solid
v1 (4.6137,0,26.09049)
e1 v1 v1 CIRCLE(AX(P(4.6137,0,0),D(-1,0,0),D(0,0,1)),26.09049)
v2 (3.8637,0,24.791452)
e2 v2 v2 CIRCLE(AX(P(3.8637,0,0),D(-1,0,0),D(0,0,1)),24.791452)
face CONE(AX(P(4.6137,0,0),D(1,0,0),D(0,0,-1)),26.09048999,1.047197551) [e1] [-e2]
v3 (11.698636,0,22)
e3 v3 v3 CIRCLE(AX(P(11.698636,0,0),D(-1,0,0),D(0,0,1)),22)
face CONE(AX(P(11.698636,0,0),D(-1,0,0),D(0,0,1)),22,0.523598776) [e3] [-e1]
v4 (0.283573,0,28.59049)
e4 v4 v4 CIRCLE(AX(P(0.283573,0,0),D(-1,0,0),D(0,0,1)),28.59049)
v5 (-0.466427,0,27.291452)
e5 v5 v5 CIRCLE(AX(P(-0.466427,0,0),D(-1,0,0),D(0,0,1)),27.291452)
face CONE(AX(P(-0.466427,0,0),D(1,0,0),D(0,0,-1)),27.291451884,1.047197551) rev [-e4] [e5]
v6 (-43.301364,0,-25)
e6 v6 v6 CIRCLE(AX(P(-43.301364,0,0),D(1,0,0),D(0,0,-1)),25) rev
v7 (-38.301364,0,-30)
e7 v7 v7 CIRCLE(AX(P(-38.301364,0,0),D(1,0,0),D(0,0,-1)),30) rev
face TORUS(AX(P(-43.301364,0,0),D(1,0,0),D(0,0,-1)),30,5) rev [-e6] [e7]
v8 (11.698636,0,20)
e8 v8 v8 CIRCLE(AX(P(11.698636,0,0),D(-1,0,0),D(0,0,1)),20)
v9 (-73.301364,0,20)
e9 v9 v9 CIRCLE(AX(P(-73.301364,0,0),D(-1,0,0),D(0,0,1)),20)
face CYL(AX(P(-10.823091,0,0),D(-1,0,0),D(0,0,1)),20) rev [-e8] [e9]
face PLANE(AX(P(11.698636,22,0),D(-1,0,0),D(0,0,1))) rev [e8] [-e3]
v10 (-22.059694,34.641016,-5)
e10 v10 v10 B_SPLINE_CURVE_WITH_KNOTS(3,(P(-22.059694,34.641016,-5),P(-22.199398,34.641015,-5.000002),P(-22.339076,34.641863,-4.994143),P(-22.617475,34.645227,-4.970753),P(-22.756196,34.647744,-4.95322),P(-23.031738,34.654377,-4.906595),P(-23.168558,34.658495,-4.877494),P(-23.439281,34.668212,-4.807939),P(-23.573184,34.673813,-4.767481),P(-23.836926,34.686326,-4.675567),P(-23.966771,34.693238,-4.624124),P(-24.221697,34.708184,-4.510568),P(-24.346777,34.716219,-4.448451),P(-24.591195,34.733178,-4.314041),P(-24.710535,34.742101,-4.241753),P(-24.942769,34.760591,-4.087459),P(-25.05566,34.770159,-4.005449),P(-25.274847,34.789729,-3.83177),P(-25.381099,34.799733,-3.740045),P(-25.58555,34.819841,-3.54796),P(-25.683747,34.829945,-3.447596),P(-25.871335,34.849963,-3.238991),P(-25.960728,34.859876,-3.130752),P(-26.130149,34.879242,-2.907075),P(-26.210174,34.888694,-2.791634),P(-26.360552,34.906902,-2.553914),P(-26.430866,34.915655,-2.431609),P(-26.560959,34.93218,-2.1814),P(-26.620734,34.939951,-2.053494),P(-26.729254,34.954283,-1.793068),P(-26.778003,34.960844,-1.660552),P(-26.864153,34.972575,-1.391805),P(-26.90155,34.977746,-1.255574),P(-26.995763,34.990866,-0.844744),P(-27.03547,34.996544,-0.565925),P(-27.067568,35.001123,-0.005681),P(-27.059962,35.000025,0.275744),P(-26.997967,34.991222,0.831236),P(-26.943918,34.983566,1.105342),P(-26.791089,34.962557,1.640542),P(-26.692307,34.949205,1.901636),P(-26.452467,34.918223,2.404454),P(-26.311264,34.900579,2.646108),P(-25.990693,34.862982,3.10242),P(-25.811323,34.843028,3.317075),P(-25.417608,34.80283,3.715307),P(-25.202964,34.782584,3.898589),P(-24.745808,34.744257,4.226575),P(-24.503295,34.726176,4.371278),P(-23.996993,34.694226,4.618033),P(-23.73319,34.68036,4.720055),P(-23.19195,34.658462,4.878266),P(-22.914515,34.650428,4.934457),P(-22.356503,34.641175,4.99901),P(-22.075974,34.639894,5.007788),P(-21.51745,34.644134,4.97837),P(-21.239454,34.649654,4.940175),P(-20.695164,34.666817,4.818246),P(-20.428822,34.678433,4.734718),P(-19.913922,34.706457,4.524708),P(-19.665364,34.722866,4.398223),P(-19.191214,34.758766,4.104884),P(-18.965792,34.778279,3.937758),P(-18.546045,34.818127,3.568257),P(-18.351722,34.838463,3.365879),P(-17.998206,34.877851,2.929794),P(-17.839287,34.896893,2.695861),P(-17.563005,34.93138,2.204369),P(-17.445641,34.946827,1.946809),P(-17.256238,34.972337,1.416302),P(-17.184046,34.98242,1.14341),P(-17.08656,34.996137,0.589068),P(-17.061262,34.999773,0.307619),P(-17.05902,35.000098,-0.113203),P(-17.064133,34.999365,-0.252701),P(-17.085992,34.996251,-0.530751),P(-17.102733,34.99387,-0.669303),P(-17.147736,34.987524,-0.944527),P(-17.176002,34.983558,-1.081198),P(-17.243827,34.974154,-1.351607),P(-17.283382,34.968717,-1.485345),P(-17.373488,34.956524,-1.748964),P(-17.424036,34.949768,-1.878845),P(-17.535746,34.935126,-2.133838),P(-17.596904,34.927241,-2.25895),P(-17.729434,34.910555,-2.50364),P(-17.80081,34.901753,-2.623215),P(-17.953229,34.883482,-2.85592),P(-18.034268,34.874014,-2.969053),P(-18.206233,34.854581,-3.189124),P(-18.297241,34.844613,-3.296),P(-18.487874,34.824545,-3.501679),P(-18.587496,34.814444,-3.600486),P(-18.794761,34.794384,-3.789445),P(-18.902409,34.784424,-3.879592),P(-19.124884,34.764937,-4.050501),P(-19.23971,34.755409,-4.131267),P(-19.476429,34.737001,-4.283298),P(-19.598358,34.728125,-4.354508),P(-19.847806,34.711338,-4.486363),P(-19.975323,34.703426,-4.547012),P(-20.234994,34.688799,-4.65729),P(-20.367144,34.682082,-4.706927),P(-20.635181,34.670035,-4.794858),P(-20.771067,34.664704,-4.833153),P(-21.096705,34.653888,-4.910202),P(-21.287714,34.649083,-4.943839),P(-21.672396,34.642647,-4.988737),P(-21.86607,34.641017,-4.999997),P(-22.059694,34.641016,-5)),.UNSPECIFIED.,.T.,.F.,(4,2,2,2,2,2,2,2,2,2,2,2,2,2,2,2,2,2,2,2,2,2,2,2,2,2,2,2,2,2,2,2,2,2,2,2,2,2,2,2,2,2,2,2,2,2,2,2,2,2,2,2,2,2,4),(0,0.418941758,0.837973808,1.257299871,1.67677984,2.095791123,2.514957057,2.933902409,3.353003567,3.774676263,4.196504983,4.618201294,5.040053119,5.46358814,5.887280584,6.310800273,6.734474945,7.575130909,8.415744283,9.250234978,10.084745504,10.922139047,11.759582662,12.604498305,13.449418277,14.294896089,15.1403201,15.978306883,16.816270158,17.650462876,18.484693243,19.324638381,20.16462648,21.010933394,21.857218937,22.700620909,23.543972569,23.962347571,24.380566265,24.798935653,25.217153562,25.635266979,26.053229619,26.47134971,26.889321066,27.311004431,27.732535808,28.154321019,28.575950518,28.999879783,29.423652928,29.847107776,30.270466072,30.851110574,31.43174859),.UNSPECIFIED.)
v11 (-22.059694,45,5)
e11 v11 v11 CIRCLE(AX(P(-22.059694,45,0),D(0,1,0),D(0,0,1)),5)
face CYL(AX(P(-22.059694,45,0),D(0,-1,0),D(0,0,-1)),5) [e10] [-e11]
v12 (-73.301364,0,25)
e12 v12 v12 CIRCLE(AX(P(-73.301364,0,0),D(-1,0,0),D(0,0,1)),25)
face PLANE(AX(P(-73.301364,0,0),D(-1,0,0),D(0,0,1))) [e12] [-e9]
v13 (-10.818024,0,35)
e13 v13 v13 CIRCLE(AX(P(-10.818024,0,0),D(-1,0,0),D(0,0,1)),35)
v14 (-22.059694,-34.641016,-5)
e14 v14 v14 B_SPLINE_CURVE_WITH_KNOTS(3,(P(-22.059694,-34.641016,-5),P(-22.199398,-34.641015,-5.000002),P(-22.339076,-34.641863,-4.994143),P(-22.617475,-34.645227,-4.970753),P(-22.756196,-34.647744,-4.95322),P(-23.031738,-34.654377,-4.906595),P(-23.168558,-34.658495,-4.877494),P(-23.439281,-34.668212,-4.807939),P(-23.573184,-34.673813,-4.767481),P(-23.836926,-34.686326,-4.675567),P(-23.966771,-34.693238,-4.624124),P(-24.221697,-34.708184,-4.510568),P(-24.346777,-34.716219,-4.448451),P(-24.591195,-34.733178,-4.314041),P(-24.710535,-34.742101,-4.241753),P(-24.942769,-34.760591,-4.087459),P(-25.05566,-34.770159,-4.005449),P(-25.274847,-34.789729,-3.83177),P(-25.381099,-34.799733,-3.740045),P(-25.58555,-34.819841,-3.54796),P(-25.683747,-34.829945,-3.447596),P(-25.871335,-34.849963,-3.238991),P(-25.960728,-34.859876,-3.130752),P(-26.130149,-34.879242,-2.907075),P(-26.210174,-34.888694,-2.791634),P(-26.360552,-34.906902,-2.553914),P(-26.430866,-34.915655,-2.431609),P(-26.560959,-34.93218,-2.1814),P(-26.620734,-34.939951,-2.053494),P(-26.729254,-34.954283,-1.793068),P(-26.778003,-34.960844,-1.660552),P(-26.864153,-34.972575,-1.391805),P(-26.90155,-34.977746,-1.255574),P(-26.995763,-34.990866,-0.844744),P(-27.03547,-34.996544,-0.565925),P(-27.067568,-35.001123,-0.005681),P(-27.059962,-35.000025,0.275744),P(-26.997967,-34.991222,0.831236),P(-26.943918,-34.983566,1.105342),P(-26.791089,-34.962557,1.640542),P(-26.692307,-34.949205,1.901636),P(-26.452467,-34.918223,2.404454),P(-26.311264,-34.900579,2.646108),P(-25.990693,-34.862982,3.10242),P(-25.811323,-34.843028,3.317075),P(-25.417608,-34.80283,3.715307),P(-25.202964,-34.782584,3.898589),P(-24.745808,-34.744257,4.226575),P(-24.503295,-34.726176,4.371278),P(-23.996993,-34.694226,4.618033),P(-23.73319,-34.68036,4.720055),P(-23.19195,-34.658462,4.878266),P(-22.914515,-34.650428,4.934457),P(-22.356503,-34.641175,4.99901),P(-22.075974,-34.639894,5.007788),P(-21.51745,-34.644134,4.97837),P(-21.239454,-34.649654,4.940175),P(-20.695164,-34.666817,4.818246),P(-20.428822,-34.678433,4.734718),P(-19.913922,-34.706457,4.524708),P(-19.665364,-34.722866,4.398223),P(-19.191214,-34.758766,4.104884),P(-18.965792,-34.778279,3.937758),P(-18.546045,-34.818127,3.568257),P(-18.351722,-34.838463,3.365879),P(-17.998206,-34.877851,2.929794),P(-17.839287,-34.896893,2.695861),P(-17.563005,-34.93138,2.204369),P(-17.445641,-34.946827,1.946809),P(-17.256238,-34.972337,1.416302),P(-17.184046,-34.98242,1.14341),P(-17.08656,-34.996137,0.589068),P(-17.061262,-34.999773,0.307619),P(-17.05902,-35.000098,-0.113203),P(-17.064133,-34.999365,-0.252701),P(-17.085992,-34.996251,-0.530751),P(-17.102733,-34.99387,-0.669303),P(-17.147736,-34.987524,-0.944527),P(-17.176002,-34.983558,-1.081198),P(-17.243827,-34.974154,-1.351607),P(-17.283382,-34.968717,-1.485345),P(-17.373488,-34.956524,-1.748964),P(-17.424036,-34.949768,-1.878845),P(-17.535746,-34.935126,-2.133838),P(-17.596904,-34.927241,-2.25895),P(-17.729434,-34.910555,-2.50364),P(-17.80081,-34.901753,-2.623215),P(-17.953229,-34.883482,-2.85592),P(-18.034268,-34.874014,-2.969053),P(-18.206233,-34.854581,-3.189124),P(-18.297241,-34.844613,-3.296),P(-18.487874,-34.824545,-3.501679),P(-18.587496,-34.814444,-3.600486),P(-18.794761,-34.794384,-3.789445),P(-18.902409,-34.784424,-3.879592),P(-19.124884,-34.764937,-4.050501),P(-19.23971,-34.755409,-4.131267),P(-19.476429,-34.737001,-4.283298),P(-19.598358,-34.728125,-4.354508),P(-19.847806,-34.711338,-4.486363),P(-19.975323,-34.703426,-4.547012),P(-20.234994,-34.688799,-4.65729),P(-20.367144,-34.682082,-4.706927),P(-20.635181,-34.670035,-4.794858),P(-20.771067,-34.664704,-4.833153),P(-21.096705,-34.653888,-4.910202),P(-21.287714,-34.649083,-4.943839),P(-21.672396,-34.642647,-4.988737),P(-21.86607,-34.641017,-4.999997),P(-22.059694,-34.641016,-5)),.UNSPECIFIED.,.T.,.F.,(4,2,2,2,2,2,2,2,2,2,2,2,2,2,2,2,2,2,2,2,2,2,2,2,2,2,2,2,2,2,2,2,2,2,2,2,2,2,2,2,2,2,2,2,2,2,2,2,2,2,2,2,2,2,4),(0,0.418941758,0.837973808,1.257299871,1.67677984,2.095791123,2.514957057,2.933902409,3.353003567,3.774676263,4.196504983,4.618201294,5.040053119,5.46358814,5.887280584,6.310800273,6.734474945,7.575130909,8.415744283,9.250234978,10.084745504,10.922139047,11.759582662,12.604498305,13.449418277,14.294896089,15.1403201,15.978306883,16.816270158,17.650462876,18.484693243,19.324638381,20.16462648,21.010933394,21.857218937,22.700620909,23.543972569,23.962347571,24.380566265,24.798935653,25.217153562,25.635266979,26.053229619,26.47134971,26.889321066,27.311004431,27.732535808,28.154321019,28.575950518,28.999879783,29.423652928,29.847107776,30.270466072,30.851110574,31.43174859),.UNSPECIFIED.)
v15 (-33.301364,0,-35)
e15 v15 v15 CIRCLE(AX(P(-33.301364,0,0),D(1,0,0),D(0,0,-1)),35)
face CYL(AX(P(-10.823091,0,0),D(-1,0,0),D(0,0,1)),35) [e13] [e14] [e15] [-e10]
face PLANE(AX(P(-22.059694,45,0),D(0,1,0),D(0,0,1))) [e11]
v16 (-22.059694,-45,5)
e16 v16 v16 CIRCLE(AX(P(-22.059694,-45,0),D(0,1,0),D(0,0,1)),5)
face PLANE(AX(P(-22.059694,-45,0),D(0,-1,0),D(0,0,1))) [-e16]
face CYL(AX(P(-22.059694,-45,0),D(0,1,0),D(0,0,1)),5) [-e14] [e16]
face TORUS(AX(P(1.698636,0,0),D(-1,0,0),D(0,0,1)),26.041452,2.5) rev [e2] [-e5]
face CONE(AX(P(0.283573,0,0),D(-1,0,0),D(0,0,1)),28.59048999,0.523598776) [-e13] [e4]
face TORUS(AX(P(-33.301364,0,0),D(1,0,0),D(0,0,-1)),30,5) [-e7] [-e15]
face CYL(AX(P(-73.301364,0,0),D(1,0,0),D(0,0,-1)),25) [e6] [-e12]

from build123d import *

# Parameters (mm, degrees)
SKETCH3_R                       = 25
SKETCH3_R_2                     = 20
BOSS_EXTRUDE2_DEPTH             = 35
FILLET1_R                       = 5
BOSS_EXTRUDE1_REACH             = 113.924
SKETCH2_R                       = 5
BOSS_EXTRUDE1_DIRECTION_2_DEPTH = 3


with BuildPart() as part:
    # Sketch1 → Revolve1 (revolve)
    with BuildSketch(Plane.XY, mode=Mode.PRIVATE) as revolve1_sk:
        with BuildLine():
            Line((-10.818024311, 35), (-38.301363812, 35))
            Line((-38.301363812, 35), (-38.301363812, 20))
            Line((-38.301363812, 20), (11.698636188, 20))
            Line((11.698636188, 20), (11.698636188, 22))
            Line((11.698636188, 22), (4.613699697, 26.09048999))
            Line((4.613699697, 26.09048999), (3.863699697, 24.791451884))
            ThreePointArc((3.863699697, 24.791451884), (0.448636188, 23.876388375), (-0.466427322, 27.291451884))
            Line((-0.466427322, 27.291451884), (0.283572678, 28.59048999))
            Line((0.283572678, 28.59048999), (-10.818024311, 35))
        make_face()
    revolve(revolve1_sk.sketch.rotate(Axis((-10.823091425, 0, 0), (1, 0, 0)), 90), axis=Axis((-10.823091425, 0, 0), (1, 0, 0)))

    # Sketch3 → Boss-Extrude2 (add)
    with BuildSketch(Plane.ZY.offset(38.301363812)):
        with Locations(Location((0, 0, 0), (0, 0, 180))):
            Circle(SKETCH3_R)
        Circle(SKETCH3_R_2, mode=Mode.SUBTRACT)
    extrude(amount=BOSS_EXTRUDE2_DEPTH)

    # Fillet1
    fillet1_edges = [part.edges().sort_by_distance(p)[0] for p in [
        (-38.301363812, 0, 25),
        (-38.301363812, 0, -35),
    ]]
    fillet(fillet1_edges, radius=FILLET1_R - 0.0001)  # a hair under: the kernel refuses the full size

    # Sketch2 → Boss-Extrude1 (add, up to next)
    with BuildSketch(Plane(origin=(0, 42, 0), x_dir=(1, 0, 0), z_dir=(0, 1, 0)), mode=Mode.PRIVATE) as boss_extrude1_sk1:
        with Locations(Location((-22.059694062, 0, 0), (0, 0, 90))):
            Circle(SKETCH2_R)
    boss_extrude1_tool1 = extrude(boss_extrude1_sk1.sketch, amount=-BOSS_EXTRUDE1_REACH, mode=Mode.PRIVATE) - part.part
    boss_extrude1 = boss_extrude1_tool1.solids().sort_by_distance((-22.059694, 42, 0))[0]
    add(boss_extrude1)

    # Sketch2 → Boss-Extrude1 direction 2 (add)
    with BuildSketch(Plane(origin=(0, 42, 0), x_dir=(1, 0, 0), z_dir=(0, 1, 0))):
        with Locations(Location((-22.059694062, 0, 0), (0, 0, 90))):
            Circle(SKETCH2_R)
    boss_extrude1_direction_2 = extrude(amount=BOSS_EXTRUDE1_DIRECTION_2_DEPTH)

    # Mirror1: Boss-Extrude1, Boss-Extrude1 direction 2 across plane
    add(boss_extrude1.mirror(Plane.ZX))
    add(boss_extrude1_direction_2.mirror(Plane.ZX))


solid = part.part
